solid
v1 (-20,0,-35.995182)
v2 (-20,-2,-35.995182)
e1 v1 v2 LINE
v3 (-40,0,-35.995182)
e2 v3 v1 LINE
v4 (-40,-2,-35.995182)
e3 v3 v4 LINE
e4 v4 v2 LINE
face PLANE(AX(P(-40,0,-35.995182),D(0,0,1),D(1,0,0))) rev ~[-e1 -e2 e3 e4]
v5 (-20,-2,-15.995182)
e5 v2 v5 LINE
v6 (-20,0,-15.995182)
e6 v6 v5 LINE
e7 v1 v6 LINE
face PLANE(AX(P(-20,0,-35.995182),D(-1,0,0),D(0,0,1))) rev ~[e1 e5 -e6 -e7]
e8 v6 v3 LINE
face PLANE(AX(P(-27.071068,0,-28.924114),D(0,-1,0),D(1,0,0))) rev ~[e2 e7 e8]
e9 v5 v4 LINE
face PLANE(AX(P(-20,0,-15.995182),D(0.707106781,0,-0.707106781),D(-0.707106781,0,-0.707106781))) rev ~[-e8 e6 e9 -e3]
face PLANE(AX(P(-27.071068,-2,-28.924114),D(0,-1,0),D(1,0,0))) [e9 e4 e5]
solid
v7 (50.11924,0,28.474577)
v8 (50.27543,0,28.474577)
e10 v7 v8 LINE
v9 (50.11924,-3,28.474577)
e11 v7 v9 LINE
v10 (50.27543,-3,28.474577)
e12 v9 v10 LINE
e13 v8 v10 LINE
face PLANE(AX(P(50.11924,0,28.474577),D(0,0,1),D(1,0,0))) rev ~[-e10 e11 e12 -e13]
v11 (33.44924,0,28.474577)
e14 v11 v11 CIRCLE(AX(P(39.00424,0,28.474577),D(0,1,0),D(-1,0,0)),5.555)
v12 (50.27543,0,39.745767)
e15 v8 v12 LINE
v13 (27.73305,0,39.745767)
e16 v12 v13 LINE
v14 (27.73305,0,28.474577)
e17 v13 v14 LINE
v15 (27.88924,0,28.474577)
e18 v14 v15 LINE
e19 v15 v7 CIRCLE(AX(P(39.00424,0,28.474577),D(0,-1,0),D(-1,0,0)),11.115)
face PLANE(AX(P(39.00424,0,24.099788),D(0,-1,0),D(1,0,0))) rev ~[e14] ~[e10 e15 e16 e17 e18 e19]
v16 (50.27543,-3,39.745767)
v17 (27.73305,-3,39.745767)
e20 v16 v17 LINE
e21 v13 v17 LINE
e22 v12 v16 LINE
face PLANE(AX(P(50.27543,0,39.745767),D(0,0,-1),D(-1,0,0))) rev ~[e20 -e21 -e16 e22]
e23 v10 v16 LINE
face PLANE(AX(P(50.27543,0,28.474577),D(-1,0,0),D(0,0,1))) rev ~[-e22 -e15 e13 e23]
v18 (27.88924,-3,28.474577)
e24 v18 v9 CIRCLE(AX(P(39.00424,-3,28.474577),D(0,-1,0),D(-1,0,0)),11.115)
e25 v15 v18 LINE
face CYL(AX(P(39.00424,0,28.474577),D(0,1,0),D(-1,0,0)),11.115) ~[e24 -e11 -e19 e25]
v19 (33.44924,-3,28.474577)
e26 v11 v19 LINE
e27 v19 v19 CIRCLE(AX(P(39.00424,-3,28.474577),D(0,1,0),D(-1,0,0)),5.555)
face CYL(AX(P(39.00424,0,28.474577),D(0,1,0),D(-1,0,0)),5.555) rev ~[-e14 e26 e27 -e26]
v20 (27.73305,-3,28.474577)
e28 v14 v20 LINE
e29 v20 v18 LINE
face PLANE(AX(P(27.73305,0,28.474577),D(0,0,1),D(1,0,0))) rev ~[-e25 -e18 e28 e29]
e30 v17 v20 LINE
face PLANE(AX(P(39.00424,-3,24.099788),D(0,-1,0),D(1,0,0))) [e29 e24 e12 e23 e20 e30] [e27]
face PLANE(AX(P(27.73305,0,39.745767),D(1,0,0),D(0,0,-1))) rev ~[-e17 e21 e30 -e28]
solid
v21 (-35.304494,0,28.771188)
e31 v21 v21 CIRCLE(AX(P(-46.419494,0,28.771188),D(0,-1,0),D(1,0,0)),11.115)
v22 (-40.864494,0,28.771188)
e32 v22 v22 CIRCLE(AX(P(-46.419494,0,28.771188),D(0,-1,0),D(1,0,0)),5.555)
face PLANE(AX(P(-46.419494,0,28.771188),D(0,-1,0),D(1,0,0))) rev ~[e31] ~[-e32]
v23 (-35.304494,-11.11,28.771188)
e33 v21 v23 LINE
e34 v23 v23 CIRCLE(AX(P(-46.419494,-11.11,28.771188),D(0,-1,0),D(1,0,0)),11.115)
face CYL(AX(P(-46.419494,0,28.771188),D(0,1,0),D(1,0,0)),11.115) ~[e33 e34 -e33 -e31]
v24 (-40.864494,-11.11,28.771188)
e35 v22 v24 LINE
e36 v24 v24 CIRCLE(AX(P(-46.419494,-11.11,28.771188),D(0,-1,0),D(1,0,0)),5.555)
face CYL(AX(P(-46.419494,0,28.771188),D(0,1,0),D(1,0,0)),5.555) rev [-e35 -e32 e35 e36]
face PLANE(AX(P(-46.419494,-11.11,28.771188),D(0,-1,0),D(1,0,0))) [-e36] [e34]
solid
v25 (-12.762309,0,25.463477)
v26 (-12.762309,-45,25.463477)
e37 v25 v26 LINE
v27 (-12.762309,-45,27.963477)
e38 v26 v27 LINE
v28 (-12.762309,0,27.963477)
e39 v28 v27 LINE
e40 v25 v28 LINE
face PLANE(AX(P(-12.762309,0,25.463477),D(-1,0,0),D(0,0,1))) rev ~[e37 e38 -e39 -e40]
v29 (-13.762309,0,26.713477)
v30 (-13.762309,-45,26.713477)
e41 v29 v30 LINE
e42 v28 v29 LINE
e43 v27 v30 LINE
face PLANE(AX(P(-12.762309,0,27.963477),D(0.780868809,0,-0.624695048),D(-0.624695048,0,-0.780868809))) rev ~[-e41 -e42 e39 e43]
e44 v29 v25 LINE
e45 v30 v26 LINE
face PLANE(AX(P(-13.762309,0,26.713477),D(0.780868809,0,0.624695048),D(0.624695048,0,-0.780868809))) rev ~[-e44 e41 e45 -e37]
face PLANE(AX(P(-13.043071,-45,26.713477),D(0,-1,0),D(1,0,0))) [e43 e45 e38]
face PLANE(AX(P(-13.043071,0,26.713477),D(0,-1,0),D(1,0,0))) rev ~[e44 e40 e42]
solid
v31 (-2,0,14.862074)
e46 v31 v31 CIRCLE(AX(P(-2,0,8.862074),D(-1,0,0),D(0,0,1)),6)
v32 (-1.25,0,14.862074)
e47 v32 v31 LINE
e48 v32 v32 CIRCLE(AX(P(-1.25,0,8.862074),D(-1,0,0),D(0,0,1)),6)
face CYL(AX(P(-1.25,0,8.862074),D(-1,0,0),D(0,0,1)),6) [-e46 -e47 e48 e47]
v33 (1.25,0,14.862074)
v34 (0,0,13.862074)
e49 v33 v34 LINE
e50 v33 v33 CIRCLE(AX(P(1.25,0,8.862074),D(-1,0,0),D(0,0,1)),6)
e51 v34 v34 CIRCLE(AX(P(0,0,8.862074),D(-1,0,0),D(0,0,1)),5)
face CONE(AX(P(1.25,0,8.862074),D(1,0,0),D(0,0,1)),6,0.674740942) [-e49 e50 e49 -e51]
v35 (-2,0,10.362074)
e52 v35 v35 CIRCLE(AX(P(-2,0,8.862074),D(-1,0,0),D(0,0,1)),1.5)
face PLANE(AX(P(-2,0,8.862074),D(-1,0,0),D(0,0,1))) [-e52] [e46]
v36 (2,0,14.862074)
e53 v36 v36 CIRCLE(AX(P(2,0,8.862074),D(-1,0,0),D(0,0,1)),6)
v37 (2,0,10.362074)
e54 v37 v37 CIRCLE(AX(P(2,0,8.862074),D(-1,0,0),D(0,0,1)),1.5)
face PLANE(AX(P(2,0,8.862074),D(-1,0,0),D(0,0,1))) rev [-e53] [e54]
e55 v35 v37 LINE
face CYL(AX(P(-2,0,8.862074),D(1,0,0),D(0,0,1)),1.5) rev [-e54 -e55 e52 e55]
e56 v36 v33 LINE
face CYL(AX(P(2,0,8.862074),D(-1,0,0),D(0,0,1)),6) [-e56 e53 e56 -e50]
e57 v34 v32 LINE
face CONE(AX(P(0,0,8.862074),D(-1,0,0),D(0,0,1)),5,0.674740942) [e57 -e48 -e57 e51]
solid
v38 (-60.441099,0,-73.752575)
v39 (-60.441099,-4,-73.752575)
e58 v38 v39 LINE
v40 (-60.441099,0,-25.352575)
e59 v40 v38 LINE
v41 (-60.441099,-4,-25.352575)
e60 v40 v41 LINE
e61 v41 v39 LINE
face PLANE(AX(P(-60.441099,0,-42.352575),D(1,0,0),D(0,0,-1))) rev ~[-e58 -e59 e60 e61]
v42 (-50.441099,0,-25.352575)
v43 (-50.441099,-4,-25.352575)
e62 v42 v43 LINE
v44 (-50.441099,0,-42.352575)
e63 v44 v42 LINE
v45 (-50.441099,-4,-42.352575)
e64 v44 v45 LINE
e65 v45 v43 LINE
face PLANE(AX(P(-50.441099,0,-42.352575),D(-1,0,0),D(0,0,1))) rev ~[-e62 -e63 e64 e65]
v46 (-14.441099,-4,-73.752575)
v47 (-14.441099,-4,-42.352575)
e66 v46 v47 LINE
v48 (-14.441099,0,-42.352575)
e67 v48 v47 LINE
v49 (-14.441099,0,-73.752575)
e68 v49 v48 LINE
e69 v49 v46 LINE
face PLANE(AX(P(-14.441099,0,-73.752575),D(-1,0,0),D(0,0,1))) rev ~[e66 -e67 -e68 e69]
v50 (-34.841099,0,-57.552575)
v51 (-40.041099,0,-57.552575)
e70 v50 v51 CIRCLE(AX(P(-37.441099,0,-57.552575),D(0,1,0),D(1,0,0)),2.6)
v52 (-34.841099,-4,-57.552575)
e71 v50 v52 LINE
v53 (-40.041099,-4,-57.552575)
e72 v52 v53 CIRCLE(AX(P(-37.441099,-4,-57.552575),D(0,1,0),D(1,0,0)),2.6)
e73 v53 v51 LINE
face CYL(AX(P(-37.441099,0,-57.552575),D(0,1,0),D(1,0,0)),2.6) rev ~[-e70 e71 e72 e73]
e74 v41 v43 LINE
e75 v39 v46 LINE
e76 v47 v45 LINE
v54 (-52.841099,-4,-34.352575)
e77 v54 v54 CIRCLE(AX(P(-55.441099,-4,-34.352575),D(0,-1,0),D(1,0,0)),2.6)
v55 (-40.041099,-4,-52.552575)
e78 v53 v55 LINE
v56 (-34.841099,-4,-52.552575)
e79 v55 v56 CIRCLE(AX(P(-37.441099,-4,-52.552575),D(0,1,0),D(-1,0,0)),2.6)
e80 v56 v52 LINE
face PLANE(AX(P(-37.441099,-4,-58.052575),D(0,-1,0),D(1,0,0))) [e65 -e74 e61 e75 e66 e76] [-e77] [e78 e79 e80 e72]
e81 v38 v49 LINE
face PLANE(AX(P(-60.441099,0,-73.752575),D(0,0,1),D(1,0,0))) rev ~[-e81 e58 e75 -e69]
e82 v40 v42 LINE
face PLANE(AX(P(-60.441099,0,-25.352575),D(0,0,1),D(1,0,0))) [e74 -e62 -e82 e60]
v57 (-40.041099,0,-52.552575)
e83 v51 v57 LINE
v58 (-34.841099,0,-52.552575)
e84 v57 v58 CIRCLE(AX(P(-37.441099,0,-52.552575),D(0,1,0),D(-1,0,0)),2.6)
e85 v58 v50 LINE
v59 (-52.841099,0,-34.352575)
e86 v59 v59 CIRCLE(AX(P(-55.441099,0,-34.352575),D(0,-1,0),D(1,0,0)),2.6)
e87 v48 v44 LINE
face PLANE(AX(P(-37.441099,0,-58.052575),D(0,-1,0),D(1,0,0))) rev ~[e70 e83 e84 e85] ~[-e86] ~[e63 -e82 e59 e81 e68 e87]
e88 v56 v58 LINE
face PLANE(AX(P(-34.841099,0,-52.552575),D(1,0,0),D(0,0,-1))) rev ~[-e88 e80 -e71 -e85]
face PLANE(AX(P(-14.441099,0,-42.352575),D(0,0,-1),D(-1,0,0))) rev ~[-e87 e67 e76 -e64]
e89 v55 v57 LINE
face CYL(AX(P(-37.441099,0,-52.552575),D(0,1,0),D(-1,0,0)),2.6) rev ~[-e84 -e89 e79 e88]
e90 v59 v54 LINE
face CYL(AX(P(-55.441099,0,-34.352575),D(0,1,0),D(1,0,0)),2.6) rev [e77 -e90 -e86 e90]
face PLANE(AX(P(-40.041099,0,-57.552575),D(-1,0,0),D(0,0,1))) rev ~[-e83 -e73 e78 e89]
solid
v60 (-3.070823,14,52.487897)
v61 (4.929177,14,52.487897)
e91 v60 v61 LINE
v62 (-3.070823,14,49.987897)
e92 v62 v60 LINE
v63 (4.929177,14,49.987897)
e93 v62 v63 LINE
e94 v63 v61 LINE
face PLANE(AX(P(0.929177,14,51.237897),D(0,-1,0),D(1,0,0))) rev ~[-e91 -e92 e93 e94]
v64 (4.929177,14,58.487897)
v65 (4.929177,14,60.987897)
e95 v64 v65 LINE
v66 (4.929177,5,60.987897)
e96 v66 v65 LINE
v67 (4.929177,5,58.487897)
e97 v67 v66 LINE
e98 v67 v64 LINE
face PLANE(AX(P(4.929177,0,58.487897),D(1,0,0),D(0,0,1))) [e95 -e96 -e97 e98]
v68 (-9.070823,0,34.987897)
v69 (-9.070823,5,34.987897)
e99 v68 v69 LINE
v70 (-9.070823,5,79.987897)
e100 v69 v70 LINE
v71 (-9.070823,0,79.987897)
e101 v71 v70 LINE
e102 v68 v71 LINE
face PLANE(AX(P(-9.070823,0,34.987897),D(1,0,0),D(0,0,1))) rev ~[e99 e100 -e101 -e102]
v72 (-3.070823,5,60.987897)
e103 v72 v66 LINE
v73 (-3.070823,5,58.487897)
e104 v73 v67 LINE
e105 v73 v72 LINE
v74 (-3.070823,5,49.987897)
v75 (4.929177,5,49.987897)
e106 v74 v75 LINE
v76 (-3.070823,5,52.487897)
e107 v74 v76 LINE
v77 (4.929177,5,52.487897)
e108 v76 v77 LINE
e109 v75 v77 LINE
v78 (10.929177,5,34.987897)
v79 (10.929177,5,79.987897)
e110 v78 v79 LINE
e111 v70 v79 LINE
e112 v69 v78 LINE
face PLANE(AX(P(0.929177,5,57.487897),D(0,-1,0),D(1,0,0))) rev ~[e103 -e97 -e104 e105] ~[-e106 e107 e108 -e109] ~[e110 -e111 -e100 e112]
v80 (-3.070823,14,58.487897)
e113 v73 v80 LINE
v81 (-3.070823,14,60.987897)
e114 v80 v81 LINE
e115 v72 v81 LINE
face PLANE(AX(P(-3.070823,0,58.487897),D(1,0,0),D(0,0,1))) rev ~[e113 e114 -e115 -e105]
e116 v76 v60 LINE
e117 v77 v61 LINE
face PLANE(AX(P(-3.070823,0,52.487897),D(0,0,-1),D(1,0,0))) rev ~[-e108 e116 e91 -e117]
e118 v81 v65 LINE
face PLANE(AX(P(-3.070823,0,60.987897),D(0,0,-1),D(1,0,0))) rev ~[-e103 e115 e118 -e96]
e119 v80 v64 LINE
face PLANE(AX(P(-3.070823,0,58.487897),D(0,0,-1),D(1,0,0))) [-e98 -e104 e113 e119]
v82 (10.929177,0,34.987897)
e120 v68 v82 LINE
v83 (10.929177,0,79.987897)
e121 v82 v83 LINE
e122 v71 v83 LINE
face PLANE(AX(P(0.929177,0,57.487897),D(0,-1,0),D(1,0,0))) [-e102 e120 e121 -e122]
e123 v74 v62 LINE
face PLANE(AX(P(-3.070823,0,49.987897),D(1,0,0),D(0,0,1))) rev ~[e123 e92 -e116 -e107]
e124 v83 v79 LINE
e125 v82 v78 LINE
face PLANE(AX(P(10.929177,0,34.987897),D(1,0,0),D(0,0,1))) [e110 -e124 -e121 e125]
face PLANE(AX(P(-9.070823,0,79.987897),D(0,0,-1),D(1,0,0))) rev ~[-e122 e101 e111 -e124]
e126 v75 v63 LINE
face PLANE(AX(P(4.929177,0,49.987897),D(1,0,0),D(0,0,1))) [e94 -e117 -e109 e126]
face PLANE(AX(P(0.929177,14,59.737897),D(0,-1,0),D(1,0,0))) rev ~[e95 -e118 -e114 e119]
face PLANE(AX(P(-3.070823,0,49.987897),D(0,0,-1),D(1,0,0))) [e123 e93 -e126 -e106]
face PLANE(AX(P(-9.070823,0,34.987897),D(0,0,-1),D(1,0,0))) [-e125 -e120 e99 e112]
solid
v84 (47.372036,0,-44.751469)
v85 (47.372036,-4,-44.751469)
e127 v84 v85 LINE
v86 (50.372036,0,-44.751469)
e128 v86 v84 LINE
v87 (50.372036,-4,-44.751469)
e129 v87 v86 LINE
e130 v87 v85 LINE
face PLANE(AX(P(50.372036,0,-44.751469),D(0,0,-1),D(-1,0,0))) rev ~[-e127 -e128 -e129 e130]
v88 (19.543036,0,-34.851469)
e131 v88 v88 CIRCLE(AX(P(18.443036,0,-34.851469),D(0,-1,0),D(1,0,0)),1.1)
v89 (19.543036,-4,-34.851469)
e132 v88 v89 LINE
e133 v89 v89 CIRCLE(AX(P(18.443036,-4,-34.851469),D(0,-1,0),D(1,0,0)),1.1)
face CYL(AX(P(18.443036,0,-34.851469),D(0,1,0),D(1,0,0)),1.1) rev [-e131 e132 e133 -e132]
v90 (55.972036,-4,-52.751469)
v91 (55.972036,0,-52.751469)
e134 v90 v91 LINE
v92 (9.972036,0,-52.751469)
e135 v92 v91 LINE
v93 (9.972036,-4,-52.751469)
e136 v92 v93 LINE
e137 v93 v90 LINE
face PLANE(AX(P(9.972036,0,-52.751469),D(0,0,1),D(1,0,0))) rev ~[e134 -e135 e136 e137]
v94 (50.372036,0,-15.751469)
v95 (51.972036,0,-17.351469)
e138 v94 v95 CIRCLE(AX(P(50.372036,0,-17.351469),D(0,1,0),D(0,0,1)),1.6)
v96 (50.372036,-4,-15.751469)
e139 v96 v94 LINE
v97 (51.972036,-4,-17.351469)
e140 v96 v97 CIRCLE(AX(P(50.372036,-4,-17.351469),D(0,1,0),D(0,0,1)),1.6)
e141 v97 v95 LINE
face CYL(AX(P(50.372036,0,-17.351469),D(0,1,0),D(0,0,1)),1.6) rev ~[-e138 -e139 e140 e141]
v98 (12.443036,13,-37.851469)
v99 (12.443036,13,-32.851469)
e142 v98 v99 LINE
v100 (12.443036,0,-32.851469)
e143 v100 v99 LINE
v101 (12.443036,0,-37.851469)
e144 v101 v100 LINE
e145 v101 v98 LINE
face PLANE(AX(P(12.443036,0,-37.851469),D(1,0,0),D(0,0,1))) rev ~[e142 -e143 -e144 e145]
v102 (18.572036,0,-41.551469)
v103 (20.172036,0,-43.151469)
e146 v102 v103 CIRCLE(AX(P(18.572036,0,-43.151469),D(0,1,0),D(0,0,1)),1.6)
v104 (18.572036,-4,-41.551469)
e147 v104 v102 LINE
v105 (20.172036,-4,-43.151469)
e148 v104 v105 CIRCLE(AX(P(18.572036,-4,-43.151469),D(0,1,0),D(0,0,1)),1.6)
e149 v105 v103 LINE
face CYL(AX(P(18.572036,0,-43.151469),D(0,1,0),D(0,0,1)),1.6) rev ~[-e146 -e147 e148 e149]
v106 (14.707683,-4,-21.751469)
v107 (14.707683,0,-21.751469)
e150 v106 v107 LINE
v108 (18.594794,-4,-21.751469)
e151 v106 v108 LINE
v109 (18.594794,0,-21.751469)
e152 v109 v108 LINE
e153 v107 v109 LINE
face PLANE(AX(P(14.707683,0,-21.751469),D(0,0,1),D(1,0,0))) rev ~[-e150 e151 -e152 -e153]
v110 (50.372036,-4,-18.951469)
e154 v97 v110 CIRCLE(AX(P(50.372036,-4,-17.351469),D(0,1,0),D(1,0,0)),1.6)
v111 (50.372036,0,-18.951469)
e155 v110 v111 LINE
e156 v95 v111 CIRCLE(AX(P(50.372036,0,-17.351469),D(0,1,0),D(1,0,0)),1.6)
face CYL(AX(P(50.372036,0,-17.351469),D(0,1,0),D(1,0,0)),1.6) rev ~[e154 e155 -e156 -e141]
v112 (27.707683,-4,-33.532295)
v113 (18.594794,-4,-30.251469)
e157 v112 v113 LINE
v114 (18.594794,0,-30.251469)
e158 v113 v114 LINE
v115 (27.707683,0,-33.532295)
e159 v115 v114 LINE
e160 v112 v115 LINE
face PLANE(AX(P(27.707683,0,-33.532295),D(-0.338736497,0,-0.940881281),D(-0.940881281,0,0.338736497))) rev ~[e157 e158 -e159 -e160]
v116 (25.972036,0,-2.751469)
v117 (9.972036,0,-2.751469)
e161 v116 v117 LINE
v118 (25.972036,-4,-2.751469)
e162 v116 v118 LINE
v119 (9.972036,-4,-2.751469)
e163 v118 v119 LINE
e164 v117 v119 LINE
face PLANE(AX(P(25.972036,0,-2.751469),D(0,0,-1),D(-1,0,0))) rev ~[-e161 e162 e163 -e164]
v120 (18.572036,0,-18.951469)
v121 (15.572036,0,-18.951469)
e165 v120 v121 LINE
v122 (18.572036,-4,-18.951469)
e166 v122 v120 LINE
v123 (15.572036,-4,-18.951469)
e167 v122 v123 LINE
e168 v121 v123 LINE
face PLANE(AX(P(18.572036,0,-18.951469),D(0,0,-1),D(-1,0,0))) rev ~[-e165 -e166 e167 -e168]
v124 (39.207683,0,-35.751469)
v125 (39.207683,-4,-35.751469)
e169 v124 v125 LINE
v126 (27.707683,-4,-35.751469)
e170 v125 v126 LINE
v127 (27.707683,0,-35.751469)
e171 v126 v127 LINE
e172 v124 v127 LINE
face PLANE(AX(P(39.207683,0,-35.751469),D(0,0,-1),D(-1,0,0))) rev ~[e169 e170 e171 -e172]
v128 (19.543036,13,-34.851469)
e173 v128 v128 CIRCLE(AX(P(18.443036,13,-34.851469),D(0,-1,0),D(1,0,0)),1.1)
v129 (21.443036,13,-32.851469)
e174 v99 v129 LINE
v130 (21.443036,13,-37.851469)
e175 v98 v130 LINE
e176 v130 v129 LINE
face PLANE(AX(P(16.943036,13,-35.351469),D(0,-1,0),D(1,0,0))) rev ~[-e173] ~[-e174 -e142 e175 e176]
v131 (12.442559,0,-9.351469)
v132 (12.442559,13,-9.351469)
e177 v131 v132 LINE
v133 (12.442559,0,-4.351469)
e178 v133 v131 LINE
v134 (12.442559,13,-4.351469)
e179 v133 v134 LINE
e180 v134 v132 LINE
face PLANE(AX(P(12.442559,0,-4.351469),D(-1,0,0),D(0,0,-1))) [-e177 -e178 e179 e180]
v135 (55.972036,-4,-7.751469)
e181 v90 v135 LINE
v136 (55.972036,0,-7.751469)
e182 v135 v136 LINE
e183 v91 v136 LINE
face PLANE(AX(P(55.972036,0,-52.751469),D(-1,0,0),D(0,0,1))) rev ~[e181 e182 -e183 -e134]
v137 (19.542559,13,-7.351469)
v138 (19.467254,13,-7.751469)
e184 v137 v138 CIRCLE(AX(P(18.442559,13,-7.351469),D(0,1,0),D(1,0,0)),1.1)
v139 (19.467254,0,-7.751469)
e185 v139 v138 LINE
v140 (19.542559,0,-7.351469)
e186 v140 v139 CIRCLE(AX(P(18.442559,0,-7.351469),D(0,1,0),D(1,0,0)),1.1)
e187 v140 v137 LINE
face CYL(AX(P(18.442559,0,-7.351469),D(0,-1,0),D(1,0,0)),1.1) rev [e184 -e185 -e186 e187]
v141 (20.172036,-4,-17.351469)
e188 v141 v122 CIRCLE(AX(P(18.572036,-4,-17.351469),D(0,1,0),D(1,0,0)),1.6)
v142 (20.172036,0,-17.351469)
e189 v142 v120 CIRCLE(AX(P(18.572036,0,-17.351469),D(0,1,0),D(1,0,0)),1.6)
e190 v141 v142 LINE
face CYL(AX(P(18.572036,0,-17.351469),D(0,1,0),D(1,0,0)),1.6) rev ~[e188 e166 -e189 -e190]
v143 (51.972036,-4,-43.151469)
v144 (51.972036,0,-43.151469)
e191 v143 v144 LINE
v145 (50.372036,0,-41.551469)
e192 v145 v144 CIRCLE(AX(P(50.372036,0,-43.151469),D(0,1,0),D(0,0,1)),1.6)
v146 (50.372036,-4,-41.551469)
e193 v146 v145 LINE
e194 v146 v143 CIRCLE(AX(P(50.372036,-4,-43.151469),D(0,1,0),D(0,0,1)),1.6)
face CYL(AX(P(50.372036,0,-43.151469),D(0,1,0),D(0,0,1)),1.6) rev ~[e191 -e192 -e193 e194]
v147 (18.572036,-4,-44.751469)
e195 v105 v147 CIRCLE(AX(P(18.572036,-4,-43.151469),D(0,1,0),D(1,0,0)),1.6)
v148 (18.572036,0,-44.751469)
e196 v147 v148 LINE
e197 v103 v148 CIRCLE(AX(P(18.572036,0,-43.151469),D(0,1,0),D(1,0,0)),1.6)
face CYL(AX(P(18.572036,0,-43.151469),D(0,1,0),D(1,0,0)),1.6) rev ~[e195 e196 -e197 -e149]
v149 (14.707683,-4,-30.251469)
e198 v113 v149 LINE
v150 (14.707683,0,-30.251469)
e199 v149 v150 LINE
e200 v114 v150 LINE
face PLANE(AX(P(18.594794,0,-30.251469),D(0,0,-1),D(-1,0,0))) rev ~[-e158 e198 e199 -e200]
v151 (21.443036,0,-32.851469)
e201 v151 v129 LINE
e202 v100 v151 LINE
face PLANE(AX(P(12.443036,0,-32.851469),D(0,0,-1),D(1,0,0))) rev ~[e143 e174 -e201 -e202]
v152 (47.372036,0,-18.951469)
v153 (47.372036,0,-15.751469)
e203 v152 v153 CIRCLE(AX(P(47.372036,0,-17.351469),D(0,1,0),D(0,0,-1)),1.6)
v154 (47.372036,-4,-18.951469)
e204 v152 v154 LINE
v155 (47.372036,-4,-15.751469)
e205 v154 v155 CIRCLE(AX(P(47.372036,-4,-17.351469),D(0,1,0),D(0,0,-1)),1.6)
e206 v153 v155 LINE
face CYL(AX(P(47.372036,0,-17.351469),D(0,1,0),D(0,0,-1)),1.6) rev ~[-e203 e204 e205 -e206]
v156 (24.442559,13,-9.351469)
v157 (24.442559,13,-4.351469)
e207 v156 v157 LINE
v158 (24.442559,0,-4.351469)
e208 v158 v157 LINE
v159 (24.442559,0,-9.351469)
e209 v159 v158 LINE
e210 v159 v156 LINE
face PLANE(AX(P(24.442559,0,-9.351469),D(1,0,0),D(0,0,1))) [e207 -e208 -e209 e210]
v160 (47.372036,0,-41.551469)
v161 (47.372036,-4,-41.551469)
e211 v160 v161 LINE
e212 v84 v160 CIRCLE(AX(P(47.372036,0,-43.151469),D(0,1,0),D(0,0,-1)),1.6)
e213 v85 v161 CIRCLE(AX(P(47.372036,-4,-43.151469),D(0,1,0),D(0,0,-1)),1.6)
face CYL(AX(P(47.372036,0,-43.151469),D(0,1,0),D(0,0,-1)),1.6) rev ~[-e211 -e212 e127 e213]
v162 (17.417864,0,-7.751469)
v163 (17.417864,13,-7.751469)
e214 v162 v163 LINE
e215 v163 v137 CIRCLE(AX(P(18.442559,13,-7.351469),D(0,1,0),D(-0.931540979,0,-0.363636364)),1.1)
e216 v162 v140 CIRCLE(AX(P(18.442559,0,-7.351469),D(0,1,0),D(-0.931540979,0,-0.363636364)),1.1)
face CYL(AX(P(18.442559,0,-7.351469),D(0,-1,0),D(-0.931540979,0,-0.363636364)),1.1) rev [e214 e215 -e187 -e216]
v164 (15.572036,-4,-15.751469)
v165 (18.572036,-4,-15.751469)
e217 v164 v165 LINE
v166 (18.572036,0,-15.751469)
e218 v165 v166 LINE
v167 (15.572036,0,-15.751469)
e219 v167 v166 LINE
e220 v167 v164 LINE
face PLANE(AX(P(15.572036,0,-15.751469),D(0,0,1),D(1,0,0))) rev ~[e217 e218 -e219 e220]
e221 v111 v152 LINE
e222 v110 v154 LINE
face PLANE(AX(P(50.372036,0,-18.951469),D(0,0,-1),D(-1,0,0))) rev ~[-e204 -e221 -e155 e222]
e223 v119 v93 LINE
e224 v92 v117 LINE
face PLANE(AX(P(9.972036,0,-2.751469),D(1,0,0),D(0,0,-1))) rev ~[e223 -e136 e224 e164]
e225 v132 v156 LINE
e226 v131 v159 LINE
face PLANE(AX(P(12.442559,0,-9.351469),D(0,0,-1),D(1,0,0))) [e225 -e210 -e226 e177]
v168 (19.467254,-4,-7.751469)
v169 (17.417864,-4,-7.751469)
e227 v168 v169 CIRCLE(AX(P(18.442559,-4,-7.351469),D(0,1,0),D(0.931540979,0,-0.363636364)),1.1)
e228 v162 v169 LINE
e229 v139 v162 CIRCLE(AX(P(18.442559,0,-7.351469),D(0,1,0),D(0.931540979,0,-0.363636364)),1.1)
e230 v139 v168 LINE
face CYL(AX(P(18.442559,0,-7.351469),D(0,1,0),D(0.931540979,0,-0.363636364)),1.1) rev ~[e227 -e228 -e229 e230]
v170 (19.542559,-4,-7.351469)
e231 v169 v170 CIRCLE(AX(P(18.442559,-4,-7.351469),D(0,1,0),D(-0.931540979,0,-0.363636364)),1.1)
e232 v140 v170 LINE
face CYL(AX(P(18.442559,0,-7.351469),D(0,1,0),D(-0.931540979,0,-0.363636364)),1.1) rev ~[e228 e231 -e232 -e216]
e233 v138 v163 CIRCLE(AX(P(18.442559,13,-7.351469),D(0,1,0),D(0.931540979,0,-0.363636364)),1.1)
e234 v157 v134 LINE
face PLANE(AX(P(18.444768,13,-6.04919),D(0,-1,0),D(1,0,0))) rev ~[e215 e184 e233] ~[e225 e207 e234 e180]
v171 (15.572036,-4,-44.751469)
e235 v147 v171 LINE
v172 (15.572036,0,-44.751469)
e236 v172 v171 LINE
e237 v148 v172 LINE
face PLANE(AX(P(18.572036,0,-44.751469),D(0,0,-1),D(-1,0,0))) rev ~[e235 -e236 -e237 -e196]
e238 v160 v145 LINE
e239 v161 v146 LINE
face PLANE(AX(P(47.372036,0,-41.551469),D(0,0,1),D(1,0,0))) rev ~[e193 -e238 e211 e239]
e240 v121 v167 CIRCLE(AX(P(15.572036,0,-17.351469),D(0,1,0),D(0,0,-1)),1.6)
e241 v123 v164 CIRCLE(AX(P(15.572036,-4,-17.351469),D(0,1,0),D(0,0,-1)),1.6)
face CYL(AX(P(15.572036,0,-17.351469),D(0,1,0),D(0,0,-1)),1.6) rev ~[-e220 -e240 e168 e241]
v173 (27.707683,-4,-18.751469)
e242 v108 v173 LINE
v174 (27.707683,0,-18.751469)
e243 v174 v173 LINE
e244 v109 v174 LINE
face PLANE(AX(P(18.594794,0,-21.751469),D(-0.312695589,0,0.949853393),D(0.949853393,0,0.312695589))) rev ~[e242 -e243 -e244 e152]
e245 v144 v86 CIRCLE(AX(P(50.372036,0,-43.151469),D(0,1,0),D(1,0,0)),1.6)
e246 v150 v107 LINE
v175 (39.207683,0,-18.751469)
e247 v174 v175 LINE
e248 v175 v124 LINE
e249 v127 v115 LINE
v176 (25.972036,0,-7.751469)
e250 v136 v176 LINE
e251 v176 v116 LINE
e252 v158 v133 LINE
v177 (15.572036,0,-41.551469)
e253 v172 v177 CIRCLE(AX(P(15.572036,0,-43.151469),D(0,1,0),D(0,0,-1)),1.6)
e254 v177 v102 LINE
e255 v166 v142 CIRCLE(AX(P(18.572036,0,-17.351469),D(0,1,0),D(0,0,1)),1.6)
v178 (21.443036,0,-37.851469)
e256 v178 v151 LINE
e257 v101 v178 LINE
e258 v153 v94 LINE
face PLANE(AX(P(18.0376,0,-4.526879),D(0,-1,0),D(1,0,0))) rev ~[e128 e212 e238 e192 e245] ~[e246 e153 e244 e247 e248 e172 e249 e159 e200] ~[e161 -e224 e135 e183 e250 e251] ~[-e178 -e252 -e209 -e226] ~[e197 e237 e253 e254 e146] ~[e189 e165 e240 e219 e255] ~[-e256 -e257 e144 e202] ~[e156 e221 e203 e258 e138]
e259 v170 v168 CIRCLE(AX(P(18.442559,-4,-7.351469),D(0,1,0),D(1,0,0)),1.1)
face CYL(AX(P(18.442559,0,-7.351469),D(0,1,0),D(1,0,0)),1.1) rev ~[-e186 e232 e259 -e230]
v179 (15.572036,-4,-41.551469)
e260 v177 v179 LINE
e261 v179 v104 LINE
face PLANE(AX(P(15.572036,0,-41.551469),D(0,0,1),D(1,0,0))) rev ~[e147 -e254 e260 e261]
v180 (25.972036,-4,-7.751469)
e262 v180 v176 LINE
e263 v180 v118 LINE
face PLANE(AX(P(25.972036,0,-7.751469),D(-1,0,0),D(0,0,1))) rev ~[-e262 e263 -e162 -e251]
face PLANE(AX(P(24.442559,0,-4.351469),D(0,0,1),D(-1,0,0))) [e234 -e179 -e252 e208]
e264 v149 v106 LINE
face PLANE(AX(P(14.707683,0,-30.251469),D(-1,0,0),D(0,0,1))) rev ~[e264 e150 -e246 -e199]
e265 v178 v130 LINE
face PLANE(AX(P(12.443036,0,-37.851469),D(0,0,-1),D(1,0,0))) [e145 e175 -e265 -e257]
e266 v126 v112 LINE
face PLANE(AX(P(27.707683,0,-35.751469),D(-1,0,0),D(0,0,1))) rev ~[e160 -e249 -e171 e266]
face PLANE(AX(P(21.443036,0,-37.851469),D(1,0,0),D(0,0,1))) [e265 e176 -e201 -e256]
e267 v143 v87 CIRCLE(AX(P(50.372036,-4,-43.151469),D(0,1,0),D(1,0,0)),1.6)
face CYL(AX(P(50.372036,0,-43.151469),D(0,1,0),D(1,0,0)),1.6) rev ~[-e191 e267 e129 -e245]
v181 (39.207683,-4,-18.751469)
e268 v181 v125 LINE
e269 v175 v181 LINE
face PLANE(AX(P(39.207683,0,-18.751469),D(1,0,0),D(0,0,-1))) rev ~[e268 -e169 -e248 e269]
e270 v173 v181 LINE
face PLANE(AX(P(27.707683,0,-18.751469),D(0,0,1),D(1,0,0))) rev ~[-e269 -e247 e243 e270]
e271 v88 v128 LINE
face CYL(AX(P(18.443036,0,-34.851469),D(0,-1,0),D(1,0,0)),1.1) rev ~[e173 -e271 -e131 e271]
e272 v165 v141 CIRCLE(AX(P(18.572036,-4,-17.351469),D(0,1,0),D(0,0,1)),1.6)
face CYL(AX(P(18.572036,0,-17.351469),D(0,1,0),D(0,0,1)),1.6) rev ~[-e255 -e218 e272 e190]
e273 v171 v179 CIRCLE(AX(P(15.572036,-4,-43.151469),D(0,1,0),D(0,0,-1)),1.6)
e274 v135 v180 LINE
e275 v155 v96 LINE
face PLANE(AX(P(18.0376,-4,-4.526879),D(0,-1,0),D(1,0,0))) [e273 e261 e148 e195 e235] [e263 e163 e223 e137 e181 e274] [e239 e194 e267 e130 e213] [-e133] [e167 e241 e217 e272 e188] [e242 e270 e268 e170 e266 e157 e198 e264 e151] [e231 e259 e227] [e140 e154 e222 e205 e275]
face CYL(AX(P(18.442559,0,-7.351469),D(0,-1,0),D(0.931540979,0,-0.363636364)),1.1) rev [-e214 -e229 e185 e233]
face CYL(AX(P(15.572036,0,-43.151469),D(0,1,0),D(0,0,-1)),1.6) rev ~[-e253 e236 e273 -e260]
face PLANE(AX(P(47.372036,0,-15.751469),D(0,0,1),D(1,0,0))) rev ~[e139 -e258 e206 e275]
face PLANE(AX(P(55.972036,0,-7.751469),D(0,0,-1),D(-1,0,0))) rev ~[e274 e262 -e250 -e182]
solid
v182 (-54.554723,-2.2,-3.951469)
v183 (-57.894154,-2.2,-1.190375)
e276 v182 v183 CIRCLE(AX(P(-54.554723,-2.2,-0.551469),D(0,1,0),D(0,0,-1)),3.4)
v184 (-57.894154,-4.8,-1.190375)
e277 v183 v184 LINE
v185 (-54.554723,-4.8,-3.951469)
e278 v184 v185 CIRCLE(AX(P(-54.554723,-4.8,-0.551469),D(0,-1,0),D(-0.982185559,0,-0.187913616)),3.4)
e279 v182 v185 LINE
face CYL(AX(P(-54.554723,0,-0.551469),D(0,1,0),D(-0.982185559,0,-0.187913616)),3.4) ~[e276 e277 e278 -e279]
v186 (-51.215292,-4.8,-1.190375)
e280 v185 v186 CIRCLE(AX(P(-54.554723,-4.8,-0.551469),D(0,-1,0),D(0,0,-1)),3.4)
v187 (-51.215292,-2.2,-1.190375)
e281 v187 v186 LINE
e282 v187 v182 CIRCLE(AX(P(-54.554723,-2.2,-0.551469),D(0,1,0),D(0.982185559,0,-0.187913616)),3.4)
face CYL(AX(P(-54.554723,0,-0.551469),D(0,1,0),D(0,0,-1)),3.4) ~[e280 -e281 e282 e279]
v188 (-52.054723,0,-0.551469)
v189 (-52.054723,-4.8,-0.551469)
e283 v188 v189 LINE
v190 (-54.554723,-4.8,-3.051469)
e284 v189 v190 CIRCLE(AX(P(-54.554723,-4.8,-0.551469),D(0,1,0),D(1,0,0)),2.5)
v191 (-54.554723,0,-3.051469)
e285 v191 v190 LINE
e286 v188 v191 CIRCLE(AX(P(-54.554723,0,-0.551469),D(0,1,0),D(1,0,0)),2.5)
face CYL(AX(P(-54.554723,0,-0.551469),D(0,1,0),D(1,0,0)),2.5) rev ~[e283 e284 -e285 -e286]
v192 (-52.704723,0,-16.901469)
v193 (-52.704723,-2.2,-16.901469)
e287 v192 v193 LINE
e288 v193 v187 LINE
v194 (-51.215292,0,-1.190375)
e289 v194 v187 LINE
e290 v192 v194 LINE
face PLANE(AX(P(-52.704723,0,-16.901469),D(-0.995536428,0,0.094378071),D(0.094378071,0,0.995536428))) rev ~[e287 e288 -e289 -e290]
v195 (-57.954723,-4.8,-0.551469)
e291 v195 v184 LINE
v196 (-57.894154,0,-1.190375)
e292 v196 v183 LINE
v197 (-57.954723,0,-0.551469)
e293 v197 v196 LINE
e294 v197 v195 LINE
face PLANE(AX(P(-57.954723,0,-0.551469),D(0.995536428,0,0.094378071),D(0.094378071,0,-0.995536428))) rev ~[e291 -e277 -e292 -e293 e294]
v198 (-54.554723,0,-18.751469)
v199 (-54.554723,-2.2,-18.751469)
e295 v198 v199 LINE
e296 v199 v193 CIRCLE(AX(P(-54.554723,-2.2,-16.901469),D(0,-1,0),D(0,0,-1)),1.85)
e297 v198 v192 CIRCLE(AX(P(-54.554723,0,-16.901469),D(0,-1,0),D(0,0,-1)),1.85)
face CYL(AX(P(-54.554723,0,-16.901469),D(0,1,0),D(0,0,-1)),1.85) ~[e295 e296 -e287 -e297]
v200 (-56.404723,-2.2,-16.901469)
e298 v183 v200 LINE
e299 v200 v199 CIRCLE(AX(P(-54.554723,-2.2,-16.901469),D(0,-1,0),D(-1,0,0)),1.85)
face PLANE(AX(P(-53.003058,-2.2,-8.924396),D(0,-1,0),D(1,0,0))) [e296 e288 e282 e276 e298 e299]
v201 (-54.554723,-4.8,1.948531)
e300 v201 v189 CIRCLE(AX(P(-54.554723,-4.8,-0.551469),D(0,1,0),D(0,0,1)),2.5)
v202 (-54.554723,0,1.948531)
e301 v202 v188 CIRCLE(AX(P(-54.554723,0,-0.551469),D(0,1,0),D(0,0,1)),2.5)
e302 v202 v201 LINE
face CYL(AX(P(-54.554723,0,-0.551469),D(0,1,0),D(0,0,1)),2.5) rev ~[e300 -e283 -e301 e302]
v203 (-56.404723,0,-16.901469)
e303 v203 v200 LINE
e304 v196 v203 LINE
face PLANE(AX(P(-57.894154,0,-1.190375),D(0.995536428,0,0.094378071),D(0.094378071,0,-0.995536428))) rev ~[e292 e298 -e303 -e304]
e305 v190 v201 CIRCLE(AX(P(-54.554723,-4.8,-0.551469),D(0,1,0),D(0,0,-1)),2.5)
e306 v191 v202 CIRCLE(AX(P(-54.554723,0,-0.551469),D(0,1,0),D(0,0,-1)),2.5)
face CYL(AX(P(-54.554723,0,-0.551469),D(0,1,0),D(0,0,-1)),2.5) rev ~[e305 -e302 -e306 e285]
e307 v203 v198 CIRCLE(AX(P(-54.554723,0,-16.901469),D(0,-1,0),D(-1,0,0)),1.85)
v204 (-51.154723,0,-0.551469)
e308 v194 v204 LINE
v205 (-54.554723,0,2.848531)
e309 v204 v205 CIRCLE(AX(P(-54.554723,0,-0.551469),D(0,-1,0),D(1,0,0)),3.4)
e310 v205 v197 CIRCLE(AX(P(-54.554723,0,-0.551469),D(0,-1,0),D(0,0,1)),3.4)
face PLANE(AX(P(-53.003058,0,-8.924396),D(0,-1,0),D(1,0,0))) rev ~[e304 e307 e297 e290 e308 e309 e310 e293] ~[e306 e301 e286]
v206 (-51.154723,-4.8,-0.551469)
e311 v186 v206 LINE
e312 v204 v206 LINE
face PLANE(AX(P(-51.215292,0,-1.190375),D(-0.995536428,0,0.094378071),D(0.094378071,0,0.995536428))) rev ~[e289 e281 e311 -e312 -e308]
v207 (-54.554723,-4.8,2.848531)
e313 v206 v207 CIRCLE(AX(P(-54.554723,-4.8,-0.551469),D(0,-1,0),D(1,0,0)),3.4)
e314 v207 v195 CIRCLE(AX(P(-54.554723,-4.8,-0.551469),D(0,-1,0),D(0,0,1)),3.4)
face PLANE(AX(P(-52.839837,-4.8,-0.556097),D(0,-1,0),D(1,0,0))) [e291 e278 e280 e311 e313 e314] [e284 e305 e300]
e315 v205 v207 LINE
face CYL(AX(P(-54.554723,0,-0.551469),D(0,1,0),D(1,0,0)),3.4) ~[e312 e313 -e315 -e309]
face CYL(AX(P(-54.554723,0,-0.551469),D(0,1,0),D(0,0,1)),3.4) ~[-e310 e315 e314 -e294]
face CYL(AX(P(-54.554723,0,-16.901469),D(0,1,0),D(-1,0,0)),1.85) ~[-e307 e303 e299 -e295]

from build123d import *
from build123d import SkipClean  # not in build123d's __all__

# Parameters (mm, degrees)
F0_R      = 11.115
F0_R_2    = 5.555
F1_DEPTH  = 11.11
F4_DEPTH  = 4.8
F5_DEPTH  = 2.2
F0_W      = 9
F0_H      = 5
F0_R_3    = 1.1
F6_DEPTH  = 4
F7_DEPTH  = 3
F0_W_2    = 20
F0_H_2    = 45
F0_W_3    = 8
F0_H_3    = 2.5
F8_DEPTH  = 5
F9_DEPTH  = 14
F10_DEPTH = 45
F0_W_4    = 10
F0_H_4    = 17
F0_R_4    = 2.6
F11_DEPTH = 4
F12_DEPTH = 2
F13_DEPTH = 13


with BuildPart() as f1:
    # F0 (on Front) → F1 (new body)
    with BuildSketch(Plane.XZ):
        with Locations((-46.419493854, 28.7711881101)):
            Circle(F0_R)
        with Locations((-46.419493854, 28.7711881101)):
            Circle(F0_R_2, mode=Mode.SUBTRACT)
    extrude(amount=F1_DEPTH)


with BuildPart() as f3:
    # F2 (on Front) → F3 (revolve)
    with BuildSketch(Plane.XZ):
        Polygon((-2, 10.3620744314), (2, 10.3620744314), (2, 14.8620744314), (1.25, 14.8620744314), (0, 13.8620744314), (-1.25, 14.8620744314), (-2, 14.8620744314), align=None)
    revolve(axis=Axis((0, 0, 8.8620744314), (-1, 0, 0)))


with BuildPart() as f4:
    # F0 (on Front) → F4 (new body)
    with BuildSketch(Plane.XZ):
        with BuildLine():
            Line((-51.2152923013, -1.1903753393), (-51.1547232032, -0.5514690459))
            ThreePointArc((-51.1547232032, -0.5514690459), (-52.1505601471, 1.8526940102), (-54.5547232032, 2.8485309541))
            Line((-54.5547232032, 2.8485309541), (-54.5547232032, 1.9485309541))
            ThreePointArc((-54.5547232032, 1.9485309541), (-52.7869562502, 1.2162979071), (-52.0547232032, -0.5514690459))
            ThreePointArc((-52.0547232032, -0.5514690459), (-52.7869562502, -2.3192359988), (-54.5547232032, -3.0514690459))
            Line((-54.5547232032, -3.0514690459), (-54.5547232032, -3.9514690459))
            ThreePointArc((-54.5547232032, -3.9514690459), (-52.3881915738, -3.1718012193), (-51.2152923013, -1.1903753393))
        make_face()
        with BuildLine():
            Line((-54.5547232032, 1.9485309541), (-54.5547232032, 2.8485309541))
            ThreePointArc((-54.5547232032, 2.8485309541), (-56.9588862592, 1.8526940102), (-57.9547232032, -0.5514690459))
            Line((-57.9547232032, -0.5514690459), (-57.894154105, -1.1903753393))
            ThreePointArc((-57.894154105, -1.1903753393), (-56.7212548326, -3.1718012193), (-54.5547232032, -3.9514690459))
            Line((-54.5547232032, -3.9514690459), (-54.5547232032, -3.0514690459))
            ThreePointArc((-54.5547232032, -3.0514690459), (-57.0547232032, -0.5514690459), (-54.5547232032, 1.9485309541))
        make_face()
    extrude(amount=F4_DEPTH)

    # F0 (on Front) → F5 (join)
    with BuildSketch(Plane.XZ):
        with BuildLine():
            Line((-52.7047232032, -16.9014690459), (-51.2152923013, -1.1903753393))
            ThreePointArc((-51.2152923013, -1.1903753393), (-52.3881915738, -3.1718012193), (-54.5547232032, -3.9514690459))
            Line((-54.5547232032, -3.9514690459), (-54.5547232032, -15.0514690459))
            ThreePointArc((-54.5547232032, -15.0514690459), (-53.246575658, -15.5933215007), (-52.7047232032, -16.9014690459))
        make_face()
        with BuildLine():
            Line((-54.5547232032, -15.0514690459), (-54.5547232032, -3.9514690459))
            ThreePointArc((-54.5547232032, -3.9514690459), (-56.7212548326, -3.1718012193), (-57.894154105, -1.1903753393))
            Line((-57.894154105, -1.1903753393), (-56.4047232032, -16.9014690459))
            ThreePointArc((-56.4047232032, -16.9014690459), (-55.8628707484, -15.5933215007), (-54.5547232032, -15.0514690459))
        make_face()
        with BuildLine():
            ThreePointArc((-54.5547232032, -18.7514690459), (-53.246575658, -18.2096165911), (-52.7047232032, -16.9014690459))
            ThreePointArc((-52.7047232032, -16.9014690459), (-53.246575658, -15.5933215007), (-54.5547232032, -15.0514690459))
            Line((-54.5547232032, -15.0514690459), (-54.5547232032, -18.7514690459))
        make_face()
        with BuildLine():
            Line((-54.5547232032, -18.7514690459), (-54.5547232032, -15.0514690459))
            ThreePointArc((-54.5547232032, -15.0514690459), (-55.8628707484, -15.5933215007), (-56.4047232032, -16.9014690459))
            ThreePointArc((-56.4047232032, -16.9014690459), (-55.8628707484, -18.2096165911), (-54.5547232032, -18.7514690459))
        make_face()
    extrude(amount=F5_DEPTH)


with BuildPart() as f5:
    # F0 (on Front) → F5, piece 2 (new body)
    with BuildSketch(Plane.XZ):
        Polygon((55.9720356852, -7.7514690459), (25.9720356852, -7.7514690459), (24.442558834, -7.7514690459), (24.442558834, -9.3514690459), (12.442558834, -9.3514690459), (12.442558834, -7.7514690459), (9.9720356852, -7.7514690459), (9.9720356852, -52.7514690459), (55.9720356852, -52.7514690459), align=None)
        with BuildLine():
            ThreePointArc((15.5720356852, -44.7514690459), (13.9720356852, -43.1514690459), (15.5720356852, -41.5514690459))
            Line((15.5720356852, -41.5514690459), (18.5720356852, -41.5514690459))
            ThreePointArc((18.5720356852, -41.5514690459), (19.7034065351, -42.020098196), (20.1720356852, -43.1514690459))
            ThreePointArc((20.1720356852, -43.1514690459), (19.7034065351, -44.2828398958), (18.5720356852, -44.7514690459))
            Line((18.5720356852, -44.7514690459), (15.5720356852, -44.7514690459))
        make_face(mode=Mode.SUBTRACT)
        with Locations((16.9430356852, -35.3514690459)):
            Rectangle(F0_W, F0_H, mode=Mode.SUBTRACT)
        with BuildLine():
            ThreePointArc((47.3720356852, -44.7514690459), (45.7720356852, -43.1514690459), (47.3720356852, -41.5514690459))
            Line((47.3720356852, -41.5514690459), (50.3720356852, -41.5514690459))
            ThreePointArc((50.3720356852, -41.5514690459), (51.5034065351, -42.020098196), (51.9720356852, -43.1514690459))
            ThreePointArc((51.9720356852, -43.1514690459), (51.5034065351, -44.2828398958), (50.3720356852, -44.7514690459))
            Line((50.3720356852, -44.7514690459), (47.3720356852, -44.7514690459))
        make_face(mode=Mode.SUBTRACT)
        with BuildLine():
            ThreePointArc((15.5720356852, -18.9514690459), (13.9720356852, -17.3514690459), (15.5720356852, -15.7514690459))
            Line((15.5720356852, -15.7514690459), (18.5720356852, -15.7514690459))
            ThreePointArc((18.5720356852, -15.7514690459), (19.7034065351, -16.220098196), (20.1720356852, -17.3514690459))
            ThreePointArc((20.1720356852, -17.3514690459), (19.7034065351, -18.4828398958), (18.5720356852, -18.9514690459))
            Line((18.5720356852, -18.9514690459), (15.5720356852, -18.9514690459))
        make_face(mode=Mode.SUBTRACT)
        Polygon((18.5947939754, -21.7514690459), (27.7076829225, -18.7514690459), (39.2076829225, -18.7514690459), (39.2076829225, -35.7514690459), (27.7076829225, -35.7514690459), (27.7076829225, -33.5322953761), (18.5947939754, -30.2514690459), (14.7076829225, -30.2514690459), (14.7076829225, -21.7514690459), align=None, mode=Mode.SUBTRACT)
        with BuildLine():
            ThreePointArc((47.3720356852, -18.9514690459), (45.7720356852, -17.3514690459), (47.3720356852, -15.7514690459))
            Line((47.3720356852, -15.7514690459), (50.3720356852, -15.7514690459))
            ThreePointArc((50.3720356852, -15.7514690459), (51.5034065351, -16.220098196), (51.9720356852, -17.3514690459))
            ThreePointArc((51.9720356852, -17.3514690459), (51.5034065351, -18.4828398958), (50.3720356852, -18.9514690459))
            Line((50.3720356852, -18.9514690459), (47.3720356852, -18.9514690459))
        make_face(mode=Mode.SUBTRACT)
    extrude(amount=F5_DEPTH)

    # F0 (on Front) → F6 (join)
    with BuildSketch(Plane.XZ):
        Polygon((24.442558834, -7.7514690459), (25.9720356852, -7.7514690459), (25.9720356852, -2.7514690459), (9.9720356852, -2.7514690459), (9.9720356852, -7.7514690459), (12.442558834, -7.7514690459), (12.442558834, -4.3514690459), (24.442558834, -4.3514690459), align=None)
        with BuildLine():
            Line((19.4672539106, -7.7514690459), (24.442558834, -7.7514690459))
            Line((24.442558834, -7.7514690459), (24.442558834, -4.3514690459))
            Line((24.442558834, -4.3514690459), (12.442558834, -4.3514690459))
            Line((12.442558834, -4.3514690459), (12.442558834, -7.7514690459))
            Line((12.442558834, -7.7514690459), (17.4178637574, -7.7514690459))
            ThreePointArc((17.4178637574, -7.7514690459), (18.2390454244, -6.2704591976), (19.542558834, -7.3514690459))
            ThreePointArc((19.542558834, -7.3514690459), (19.5235686823, -7.5549824554), (19.4672539106, -7.7514690459))
        make_face()
        with BuildLine():
            Line((24.442558834, -9.3514690459), (24.442558834, -7.7514690459))
            Line((24.442558834, -7.7514690459), (19.4672539106, -7.7514690459))
            ThreePointArc((19.4672539106, -7.7514690459), (18.442558834, -8.4514690459), (17.4178637574, -7.7514690459))
            Line((17.4178637574, -7.7514690459), (12.442558834, -7.7514690459))
            Line((12.442558834, -7.7514690459), (12.442558834, -9.3514690459))
            Line((12.442558834, -9.3514690459), (24.442558834, -9.3514690459))
        make_face()
        Polygon((55.9720356852, -7.7514690459), (25.9720356852, -7.7514690459), (24.442558834, -7.7514690459), (24.442558834, -9.3514690459), (12.442558834, -9.3514690459), (12.442558834, -7.7514690459), (9.9720356852, -7.7514690459), (9.9720356852, -52.7514690459), (55.9720356852, -52.7514690459), align=None)
        with BuildLine():
            ThreePointArc((15.5720356852, -44.7514690459), (13.9720356852, -43.1514690459), (15.5720356852, -41.5514690459))
            Line((15.5720356852, -41.5514690459), (18.5720356852, -41.5514690459))
            ThreePointArc((18.5720356852, -41.5514690459), (19.7034065351, -42.020098196), (20.1720356852, -43.1514690459))
            ThreePointArc((20.1720356852, -43.1514690459), (19.7034065351, -44.2828398958), (18.5720356852, -44.7514690459))
            Line((18.5720356852, -44.7514690459), (15.5720356852, -44.7514690459))
        make_face(mode=Mode.SUBTRACT)
        with Locations((16.9430356852, -35.3514690459)):
            Rectangle(F0_W, F0_H, mode=Mode.SUBTRACT)
        with BuildLine():
            ThreePointArc((47.3720356852, -44.7514690459), (45.7720356852, -43.1514690459), (47.3720356852, -41.5514690459))
            Line((47.3720356852, -41.5514690459), (50.3720356852, -41.5514690459))
            ThreePointArc((50.3720356852, -41.5514690459), (51.5034065351, -42.020098196), (51.9720356852, -43.1514690459))
            ThreePointArc((51.9720356852, -43.1514690459), (51.5034065351, -44.2828398958), (50.3720356852, -44.7514690459))
            Line((50.3720356852, -44.7514690459), (47.3720356852, -44.7514690459))
        make_face(mode=Mode.SUBTRACT)
        with BuildLine():
            ThreePointArc((15.5720356852, -18.9514690459), (13.9720356852, -17.3514690459), (15.5720356852, -15.7514690459))
            Line((15.5720356852, -15.7514690459), (18.5720356852, -15.7514690459))
            ThreePointArc((18.5720356852, -15.7514690459), (19.7034065351, -16.220098196), (20.1720356852, -17.3514690459))
            ThreePointArc((20.1720356852, -17.3514690459), (19.7034065351, -18.4828398958), (18.5720356852, -18.9514690459))
            Line((18.5720356852, -18.9514690459), (15.5720356852, -18.9514690459))
        make_face(mode=Mode.SUBTRACT)
        Polygon((18.5947939754, -21.7514690459), (27.7076829225, -18.7514690459), (39.2076829225, -18.7514690459), (39.2076829225, -35.7514690459), (27.7076829225, -35.7514690459), (27.7076829225, -33.5322953761), (18.5947939754, -30.2514690459), (14.7076829225, -30.2514690459), (14.7076829225, -21.7514690459), align=None, mode=Mode.SUBTRACT)
        with BuildLine():
            ThreePointArc((47.3720356852, -18.9514690459), (45.7720356852, -17.3514690459), (47.3720356852, -15.7514690459))
            Line((47.3720356852, -15.7514690459), (50.3720356852, -15.7514690459))
            ThreePointArc((50.3720356852, -15.7514690459), (51.5034065351, -16.220098196), (51.9720356852, -17.3514690459))
            ThreePointArc((51.9720356852, -17.3514690459), (51.5034065351, -18.4828398958), (50.3720356852, -18.9514690459))
            Line((50.3720356852, -18.9514690459), (47.3720356852, -18.9514690459))
        make_face(mode=Mode.SUBTRACT)
        with Locations((16.9430356852, -35.3514690459)):
            Rectangle(F0_W, F0_H)
        with Locations((18.4430356852, -34.8514690459)):
            Circle(F0_R_3, mode=Mode.SUBTRACT)
    extrude(amount=F6_DEPTH)

    # F0 (on Front) → F13 (join)
    with BuildSketch(Plane.XZ):
        with BuildLine():
            Line((19.4672539106, -7.7514690459), (24.442558834, -7.7514690459))
            Line((24.442558834, -7.7514690459), (24.442558834, -4.3514690459))
            Line((24.442558834, -4.3514690459), (12.442558834, -4.3514690459))
            Line((12.442558834, -4.3514690459), (12.442558834, -7.7514690459))
            Line((12.442558834, -7.7514690459), (17.4178637574, -7.7514690459))
            ThreePointArc((17.4178637574, -7.7514690459), (18.2390454244, -6.2704591976), (19.542558834, -7.3514690459))
            ThreePointArc((19.542558834, -7.3514690459), (19.5235686823, -7.5549824554), (19.4672539106, -7.7514690459))
        make_face()
        with BuildLine():
            Line((24.442558834, -9.3514690459), (24.442558834, -7.7514690459))
            Line((24.442558834, -7.7514690459), (19.4672539106, -7.7514690459))
            ThreePointArc((19.4672539106, -7.7514690459), (18.442558834, -8.4514690459), (17.4178637574, -7.7514690459))
            Line((17.4178637574, -7.7514690459), (12.442558834, -7.7514690459))
            Line((12.442558834, -7.7514690459), (12.442558834, -9.3514690459))
            Line((12.442558834, -9.3514690459), (24.442558834, -9.3514690459))
        make_face()
        with Locations((16.9430356852, -35.3514690459)):
            Rectangle(F0_W, F0_H)
        with Locations((18.4430356852, -34.8514690459)):
            Circle(F0_R_3, mode=Mode.SUBTRACT)
    with SkipClean():  # cleaning this boolean's faces spoils the solid; the shape is the same uncleaned
        extrude(amount=-F13_DEPTH)


with BuildPart() as f5b:
    # F0 (on Front) → F5, piece 3 (new body)
    with BuildSketch(Plane.XZ):
        Polygon((-50.4410991073, -42.3525746226), (-60.4410991073, -42.3525746226), (-60.4410991073, -73.7525746226), (-14.4410991073, -73.7525746226), (-14.4410991073, -42.3525746226), align=None)
        with BuildLine():
            ThreePointArc((-34.8410991073, -57.5525746226), (-37.4410991073, -60.1525746226), (-40.0410991073, -57.5525746226))
            Line((-40.0410991073, -57.5525746226), (-40.0410991073, -52.5525746226))
            ThreePointArc((-40.0410991073, -52.5525746226), (-37.4410991073, -49.9525746226), (-34.8410991073, -52.5525746226))
            Line((-34.8410991073, -52.5525746226), (-34.8410991073, -57.5525746226))
        make_face(mode=Mode.SUBTRACT)
    extrude(amount=F5_DEPTH)

    # F0 (on Front) → F11 (join)
    with BuildSketch(Plane.XZ):
        Polygon((-50.4410991073, -42.3525746226), (-60.4410991073, -42.3525746226), (-60.4410991073, -73.7525746226), (-14.4410991073, -73.7525746226), (-14.4410991073, -42.3525746226), align=None)
        with BuildLine():
            ThreePointArc((-34.8410991073, -57.5525746226), (-37.4410991073, -60.1525746226), (-40.0410991073, -57.5525746226))
            Line((-40.0410991073, -57.5525746226), (-40.0410991073, -52.5525746226))
            ThreePointArc((-40.0410991073, -52.5525746226), (-37.4410991073, -49.9525746226), (-34.8410991073, -52.5525746226))
            Line((-34.8410991073, -52.5525746226), (-34.8410991073, -57.5525746226))
        make_face(mode=Mode.SUBTRACT)
        with Locations((-55.4410991073, -33.8525746226)):
            Rectangle(F0_W_4, F0_H_4)
        with Locations((-55.4410991073, -34.3525746226)):
            Circle(F0_R_4, mode=Mode.SUBTRACT)
    extrude(amount=F11_DEPTH)


with BuildPart() as f7:
    # F0 (on Front) → F7 (new body)
    with BuildSketch(Plane.XZ):
        with BuildLine():
            ThreePointArc((27.889240185, 28.4745767713), (39.004240185, 17.3595767713), (50.119240185, 28.4745767713))
            Line((50.119240185, 28.4745767713), (44.559240185, 28.4745767713))
            ThreePointArc((44.559240185, 28.4745767713), (39.004240185, 22.9195767713), (33.449240185, 28.4745767713))
            Line((33.449240185, 28.4745767713), (27.889240185, 28.4745767713))
        make_face()
        with BuildLine():
            ThreePointArc((27.889240185, 28.4745767713), (39.004240185, 39.5895767713), (50.119240185, 28.4745767713))
            Line((50.119240185, 28.4745767713), (50.2754300833, 28.4745767713))
            Line((50.2754300833, 28.4745767713), (50.2754300833, 39.7457666695))
            Line((50.2754300833, 39.7457666695), (27.7330502868, 39.7457666695))
            Line((27.7330502868, 39.7457666695), (27.7330502868, 28.4745767713))
            Line((27.7330502868, 28.4745767713), (27.889240185, 28.4745767713))
        make_face()
        with BuildLine():
            Line((44.559240185, 28.4745767713), (50.119240185, 28.4745767713))
            ThreePointArc((50.119240185, 28.4745767713), (39.004240185, 39.5895767713), (27.889240185, 28.4745767713))
            Line((27.889240185, 28.4745767713), (33.449240185, 28.4745767713))
            ThreePointArc((33.449240185, 28.4745767713), (39.004240185, 34.0295767713), (44.559240185, 28.4745767713))
        make_face()
    extrude(amount=F7_DEPTH)


with BuildPart() as f8:
    # F0 (on Front) → F8 (new body)
    with BuildSketch(Plane.XZ):
        with Locations((0.9291770309, 57.4878966808)):
            Rectangle(F0_W_2, F0_H_2)
        with Locations((0.9291770309, 51.2378966808)):
            Rectangle(F0_W_3, F0_H_3, mode=Mode.SUBTRACT)
        with Locations((0.9291770309, 59.7378966808)):
            Rectangle(F0_W_3, F0_H_3, mode=Mode.SUBTRACT)
    extrude(amount=-F8_DEPTH)

    # F0 (on Front) → F9 (join)
    with BuildSketch(Plane.XZ):
        with Locations((0.9291770309, 59.7378966808)):
            Rectangle(F0_W_3, F0_H_3)
        with Locations((0.9291770309, 51.2378966808)):
            Rectangle(F0_W_3, F0_H_3)
    extrude(amount=-F9_DEPTH)


with BuildPart() as f10:
    # F0 (on Front) → F10 (new body)
    with BuildSketch(Plane.XZ):
        Polygon((-12.762309216, 25.4634767771), (-12.762309216, 27.9634767771), (-13.762309216, 26.7134767771), align=None)
    extrude(amount=F10_DEPTH)


with BuildPart() as f12:
    # F0 (on Front) → F12 (new body)
    with BuildSketch(Plane.XZ):
        Polygon((-40, -35.9951816499), (-20, -35.9951816499), (-20, -15.9951816499), align=None)
    extrude(amount=F12_DEPTH)


solid = Compound([f1.part, f3.part, f4.part, f5.part, f5b.part, f7.part, f8.part, f10.part, f12.part])
